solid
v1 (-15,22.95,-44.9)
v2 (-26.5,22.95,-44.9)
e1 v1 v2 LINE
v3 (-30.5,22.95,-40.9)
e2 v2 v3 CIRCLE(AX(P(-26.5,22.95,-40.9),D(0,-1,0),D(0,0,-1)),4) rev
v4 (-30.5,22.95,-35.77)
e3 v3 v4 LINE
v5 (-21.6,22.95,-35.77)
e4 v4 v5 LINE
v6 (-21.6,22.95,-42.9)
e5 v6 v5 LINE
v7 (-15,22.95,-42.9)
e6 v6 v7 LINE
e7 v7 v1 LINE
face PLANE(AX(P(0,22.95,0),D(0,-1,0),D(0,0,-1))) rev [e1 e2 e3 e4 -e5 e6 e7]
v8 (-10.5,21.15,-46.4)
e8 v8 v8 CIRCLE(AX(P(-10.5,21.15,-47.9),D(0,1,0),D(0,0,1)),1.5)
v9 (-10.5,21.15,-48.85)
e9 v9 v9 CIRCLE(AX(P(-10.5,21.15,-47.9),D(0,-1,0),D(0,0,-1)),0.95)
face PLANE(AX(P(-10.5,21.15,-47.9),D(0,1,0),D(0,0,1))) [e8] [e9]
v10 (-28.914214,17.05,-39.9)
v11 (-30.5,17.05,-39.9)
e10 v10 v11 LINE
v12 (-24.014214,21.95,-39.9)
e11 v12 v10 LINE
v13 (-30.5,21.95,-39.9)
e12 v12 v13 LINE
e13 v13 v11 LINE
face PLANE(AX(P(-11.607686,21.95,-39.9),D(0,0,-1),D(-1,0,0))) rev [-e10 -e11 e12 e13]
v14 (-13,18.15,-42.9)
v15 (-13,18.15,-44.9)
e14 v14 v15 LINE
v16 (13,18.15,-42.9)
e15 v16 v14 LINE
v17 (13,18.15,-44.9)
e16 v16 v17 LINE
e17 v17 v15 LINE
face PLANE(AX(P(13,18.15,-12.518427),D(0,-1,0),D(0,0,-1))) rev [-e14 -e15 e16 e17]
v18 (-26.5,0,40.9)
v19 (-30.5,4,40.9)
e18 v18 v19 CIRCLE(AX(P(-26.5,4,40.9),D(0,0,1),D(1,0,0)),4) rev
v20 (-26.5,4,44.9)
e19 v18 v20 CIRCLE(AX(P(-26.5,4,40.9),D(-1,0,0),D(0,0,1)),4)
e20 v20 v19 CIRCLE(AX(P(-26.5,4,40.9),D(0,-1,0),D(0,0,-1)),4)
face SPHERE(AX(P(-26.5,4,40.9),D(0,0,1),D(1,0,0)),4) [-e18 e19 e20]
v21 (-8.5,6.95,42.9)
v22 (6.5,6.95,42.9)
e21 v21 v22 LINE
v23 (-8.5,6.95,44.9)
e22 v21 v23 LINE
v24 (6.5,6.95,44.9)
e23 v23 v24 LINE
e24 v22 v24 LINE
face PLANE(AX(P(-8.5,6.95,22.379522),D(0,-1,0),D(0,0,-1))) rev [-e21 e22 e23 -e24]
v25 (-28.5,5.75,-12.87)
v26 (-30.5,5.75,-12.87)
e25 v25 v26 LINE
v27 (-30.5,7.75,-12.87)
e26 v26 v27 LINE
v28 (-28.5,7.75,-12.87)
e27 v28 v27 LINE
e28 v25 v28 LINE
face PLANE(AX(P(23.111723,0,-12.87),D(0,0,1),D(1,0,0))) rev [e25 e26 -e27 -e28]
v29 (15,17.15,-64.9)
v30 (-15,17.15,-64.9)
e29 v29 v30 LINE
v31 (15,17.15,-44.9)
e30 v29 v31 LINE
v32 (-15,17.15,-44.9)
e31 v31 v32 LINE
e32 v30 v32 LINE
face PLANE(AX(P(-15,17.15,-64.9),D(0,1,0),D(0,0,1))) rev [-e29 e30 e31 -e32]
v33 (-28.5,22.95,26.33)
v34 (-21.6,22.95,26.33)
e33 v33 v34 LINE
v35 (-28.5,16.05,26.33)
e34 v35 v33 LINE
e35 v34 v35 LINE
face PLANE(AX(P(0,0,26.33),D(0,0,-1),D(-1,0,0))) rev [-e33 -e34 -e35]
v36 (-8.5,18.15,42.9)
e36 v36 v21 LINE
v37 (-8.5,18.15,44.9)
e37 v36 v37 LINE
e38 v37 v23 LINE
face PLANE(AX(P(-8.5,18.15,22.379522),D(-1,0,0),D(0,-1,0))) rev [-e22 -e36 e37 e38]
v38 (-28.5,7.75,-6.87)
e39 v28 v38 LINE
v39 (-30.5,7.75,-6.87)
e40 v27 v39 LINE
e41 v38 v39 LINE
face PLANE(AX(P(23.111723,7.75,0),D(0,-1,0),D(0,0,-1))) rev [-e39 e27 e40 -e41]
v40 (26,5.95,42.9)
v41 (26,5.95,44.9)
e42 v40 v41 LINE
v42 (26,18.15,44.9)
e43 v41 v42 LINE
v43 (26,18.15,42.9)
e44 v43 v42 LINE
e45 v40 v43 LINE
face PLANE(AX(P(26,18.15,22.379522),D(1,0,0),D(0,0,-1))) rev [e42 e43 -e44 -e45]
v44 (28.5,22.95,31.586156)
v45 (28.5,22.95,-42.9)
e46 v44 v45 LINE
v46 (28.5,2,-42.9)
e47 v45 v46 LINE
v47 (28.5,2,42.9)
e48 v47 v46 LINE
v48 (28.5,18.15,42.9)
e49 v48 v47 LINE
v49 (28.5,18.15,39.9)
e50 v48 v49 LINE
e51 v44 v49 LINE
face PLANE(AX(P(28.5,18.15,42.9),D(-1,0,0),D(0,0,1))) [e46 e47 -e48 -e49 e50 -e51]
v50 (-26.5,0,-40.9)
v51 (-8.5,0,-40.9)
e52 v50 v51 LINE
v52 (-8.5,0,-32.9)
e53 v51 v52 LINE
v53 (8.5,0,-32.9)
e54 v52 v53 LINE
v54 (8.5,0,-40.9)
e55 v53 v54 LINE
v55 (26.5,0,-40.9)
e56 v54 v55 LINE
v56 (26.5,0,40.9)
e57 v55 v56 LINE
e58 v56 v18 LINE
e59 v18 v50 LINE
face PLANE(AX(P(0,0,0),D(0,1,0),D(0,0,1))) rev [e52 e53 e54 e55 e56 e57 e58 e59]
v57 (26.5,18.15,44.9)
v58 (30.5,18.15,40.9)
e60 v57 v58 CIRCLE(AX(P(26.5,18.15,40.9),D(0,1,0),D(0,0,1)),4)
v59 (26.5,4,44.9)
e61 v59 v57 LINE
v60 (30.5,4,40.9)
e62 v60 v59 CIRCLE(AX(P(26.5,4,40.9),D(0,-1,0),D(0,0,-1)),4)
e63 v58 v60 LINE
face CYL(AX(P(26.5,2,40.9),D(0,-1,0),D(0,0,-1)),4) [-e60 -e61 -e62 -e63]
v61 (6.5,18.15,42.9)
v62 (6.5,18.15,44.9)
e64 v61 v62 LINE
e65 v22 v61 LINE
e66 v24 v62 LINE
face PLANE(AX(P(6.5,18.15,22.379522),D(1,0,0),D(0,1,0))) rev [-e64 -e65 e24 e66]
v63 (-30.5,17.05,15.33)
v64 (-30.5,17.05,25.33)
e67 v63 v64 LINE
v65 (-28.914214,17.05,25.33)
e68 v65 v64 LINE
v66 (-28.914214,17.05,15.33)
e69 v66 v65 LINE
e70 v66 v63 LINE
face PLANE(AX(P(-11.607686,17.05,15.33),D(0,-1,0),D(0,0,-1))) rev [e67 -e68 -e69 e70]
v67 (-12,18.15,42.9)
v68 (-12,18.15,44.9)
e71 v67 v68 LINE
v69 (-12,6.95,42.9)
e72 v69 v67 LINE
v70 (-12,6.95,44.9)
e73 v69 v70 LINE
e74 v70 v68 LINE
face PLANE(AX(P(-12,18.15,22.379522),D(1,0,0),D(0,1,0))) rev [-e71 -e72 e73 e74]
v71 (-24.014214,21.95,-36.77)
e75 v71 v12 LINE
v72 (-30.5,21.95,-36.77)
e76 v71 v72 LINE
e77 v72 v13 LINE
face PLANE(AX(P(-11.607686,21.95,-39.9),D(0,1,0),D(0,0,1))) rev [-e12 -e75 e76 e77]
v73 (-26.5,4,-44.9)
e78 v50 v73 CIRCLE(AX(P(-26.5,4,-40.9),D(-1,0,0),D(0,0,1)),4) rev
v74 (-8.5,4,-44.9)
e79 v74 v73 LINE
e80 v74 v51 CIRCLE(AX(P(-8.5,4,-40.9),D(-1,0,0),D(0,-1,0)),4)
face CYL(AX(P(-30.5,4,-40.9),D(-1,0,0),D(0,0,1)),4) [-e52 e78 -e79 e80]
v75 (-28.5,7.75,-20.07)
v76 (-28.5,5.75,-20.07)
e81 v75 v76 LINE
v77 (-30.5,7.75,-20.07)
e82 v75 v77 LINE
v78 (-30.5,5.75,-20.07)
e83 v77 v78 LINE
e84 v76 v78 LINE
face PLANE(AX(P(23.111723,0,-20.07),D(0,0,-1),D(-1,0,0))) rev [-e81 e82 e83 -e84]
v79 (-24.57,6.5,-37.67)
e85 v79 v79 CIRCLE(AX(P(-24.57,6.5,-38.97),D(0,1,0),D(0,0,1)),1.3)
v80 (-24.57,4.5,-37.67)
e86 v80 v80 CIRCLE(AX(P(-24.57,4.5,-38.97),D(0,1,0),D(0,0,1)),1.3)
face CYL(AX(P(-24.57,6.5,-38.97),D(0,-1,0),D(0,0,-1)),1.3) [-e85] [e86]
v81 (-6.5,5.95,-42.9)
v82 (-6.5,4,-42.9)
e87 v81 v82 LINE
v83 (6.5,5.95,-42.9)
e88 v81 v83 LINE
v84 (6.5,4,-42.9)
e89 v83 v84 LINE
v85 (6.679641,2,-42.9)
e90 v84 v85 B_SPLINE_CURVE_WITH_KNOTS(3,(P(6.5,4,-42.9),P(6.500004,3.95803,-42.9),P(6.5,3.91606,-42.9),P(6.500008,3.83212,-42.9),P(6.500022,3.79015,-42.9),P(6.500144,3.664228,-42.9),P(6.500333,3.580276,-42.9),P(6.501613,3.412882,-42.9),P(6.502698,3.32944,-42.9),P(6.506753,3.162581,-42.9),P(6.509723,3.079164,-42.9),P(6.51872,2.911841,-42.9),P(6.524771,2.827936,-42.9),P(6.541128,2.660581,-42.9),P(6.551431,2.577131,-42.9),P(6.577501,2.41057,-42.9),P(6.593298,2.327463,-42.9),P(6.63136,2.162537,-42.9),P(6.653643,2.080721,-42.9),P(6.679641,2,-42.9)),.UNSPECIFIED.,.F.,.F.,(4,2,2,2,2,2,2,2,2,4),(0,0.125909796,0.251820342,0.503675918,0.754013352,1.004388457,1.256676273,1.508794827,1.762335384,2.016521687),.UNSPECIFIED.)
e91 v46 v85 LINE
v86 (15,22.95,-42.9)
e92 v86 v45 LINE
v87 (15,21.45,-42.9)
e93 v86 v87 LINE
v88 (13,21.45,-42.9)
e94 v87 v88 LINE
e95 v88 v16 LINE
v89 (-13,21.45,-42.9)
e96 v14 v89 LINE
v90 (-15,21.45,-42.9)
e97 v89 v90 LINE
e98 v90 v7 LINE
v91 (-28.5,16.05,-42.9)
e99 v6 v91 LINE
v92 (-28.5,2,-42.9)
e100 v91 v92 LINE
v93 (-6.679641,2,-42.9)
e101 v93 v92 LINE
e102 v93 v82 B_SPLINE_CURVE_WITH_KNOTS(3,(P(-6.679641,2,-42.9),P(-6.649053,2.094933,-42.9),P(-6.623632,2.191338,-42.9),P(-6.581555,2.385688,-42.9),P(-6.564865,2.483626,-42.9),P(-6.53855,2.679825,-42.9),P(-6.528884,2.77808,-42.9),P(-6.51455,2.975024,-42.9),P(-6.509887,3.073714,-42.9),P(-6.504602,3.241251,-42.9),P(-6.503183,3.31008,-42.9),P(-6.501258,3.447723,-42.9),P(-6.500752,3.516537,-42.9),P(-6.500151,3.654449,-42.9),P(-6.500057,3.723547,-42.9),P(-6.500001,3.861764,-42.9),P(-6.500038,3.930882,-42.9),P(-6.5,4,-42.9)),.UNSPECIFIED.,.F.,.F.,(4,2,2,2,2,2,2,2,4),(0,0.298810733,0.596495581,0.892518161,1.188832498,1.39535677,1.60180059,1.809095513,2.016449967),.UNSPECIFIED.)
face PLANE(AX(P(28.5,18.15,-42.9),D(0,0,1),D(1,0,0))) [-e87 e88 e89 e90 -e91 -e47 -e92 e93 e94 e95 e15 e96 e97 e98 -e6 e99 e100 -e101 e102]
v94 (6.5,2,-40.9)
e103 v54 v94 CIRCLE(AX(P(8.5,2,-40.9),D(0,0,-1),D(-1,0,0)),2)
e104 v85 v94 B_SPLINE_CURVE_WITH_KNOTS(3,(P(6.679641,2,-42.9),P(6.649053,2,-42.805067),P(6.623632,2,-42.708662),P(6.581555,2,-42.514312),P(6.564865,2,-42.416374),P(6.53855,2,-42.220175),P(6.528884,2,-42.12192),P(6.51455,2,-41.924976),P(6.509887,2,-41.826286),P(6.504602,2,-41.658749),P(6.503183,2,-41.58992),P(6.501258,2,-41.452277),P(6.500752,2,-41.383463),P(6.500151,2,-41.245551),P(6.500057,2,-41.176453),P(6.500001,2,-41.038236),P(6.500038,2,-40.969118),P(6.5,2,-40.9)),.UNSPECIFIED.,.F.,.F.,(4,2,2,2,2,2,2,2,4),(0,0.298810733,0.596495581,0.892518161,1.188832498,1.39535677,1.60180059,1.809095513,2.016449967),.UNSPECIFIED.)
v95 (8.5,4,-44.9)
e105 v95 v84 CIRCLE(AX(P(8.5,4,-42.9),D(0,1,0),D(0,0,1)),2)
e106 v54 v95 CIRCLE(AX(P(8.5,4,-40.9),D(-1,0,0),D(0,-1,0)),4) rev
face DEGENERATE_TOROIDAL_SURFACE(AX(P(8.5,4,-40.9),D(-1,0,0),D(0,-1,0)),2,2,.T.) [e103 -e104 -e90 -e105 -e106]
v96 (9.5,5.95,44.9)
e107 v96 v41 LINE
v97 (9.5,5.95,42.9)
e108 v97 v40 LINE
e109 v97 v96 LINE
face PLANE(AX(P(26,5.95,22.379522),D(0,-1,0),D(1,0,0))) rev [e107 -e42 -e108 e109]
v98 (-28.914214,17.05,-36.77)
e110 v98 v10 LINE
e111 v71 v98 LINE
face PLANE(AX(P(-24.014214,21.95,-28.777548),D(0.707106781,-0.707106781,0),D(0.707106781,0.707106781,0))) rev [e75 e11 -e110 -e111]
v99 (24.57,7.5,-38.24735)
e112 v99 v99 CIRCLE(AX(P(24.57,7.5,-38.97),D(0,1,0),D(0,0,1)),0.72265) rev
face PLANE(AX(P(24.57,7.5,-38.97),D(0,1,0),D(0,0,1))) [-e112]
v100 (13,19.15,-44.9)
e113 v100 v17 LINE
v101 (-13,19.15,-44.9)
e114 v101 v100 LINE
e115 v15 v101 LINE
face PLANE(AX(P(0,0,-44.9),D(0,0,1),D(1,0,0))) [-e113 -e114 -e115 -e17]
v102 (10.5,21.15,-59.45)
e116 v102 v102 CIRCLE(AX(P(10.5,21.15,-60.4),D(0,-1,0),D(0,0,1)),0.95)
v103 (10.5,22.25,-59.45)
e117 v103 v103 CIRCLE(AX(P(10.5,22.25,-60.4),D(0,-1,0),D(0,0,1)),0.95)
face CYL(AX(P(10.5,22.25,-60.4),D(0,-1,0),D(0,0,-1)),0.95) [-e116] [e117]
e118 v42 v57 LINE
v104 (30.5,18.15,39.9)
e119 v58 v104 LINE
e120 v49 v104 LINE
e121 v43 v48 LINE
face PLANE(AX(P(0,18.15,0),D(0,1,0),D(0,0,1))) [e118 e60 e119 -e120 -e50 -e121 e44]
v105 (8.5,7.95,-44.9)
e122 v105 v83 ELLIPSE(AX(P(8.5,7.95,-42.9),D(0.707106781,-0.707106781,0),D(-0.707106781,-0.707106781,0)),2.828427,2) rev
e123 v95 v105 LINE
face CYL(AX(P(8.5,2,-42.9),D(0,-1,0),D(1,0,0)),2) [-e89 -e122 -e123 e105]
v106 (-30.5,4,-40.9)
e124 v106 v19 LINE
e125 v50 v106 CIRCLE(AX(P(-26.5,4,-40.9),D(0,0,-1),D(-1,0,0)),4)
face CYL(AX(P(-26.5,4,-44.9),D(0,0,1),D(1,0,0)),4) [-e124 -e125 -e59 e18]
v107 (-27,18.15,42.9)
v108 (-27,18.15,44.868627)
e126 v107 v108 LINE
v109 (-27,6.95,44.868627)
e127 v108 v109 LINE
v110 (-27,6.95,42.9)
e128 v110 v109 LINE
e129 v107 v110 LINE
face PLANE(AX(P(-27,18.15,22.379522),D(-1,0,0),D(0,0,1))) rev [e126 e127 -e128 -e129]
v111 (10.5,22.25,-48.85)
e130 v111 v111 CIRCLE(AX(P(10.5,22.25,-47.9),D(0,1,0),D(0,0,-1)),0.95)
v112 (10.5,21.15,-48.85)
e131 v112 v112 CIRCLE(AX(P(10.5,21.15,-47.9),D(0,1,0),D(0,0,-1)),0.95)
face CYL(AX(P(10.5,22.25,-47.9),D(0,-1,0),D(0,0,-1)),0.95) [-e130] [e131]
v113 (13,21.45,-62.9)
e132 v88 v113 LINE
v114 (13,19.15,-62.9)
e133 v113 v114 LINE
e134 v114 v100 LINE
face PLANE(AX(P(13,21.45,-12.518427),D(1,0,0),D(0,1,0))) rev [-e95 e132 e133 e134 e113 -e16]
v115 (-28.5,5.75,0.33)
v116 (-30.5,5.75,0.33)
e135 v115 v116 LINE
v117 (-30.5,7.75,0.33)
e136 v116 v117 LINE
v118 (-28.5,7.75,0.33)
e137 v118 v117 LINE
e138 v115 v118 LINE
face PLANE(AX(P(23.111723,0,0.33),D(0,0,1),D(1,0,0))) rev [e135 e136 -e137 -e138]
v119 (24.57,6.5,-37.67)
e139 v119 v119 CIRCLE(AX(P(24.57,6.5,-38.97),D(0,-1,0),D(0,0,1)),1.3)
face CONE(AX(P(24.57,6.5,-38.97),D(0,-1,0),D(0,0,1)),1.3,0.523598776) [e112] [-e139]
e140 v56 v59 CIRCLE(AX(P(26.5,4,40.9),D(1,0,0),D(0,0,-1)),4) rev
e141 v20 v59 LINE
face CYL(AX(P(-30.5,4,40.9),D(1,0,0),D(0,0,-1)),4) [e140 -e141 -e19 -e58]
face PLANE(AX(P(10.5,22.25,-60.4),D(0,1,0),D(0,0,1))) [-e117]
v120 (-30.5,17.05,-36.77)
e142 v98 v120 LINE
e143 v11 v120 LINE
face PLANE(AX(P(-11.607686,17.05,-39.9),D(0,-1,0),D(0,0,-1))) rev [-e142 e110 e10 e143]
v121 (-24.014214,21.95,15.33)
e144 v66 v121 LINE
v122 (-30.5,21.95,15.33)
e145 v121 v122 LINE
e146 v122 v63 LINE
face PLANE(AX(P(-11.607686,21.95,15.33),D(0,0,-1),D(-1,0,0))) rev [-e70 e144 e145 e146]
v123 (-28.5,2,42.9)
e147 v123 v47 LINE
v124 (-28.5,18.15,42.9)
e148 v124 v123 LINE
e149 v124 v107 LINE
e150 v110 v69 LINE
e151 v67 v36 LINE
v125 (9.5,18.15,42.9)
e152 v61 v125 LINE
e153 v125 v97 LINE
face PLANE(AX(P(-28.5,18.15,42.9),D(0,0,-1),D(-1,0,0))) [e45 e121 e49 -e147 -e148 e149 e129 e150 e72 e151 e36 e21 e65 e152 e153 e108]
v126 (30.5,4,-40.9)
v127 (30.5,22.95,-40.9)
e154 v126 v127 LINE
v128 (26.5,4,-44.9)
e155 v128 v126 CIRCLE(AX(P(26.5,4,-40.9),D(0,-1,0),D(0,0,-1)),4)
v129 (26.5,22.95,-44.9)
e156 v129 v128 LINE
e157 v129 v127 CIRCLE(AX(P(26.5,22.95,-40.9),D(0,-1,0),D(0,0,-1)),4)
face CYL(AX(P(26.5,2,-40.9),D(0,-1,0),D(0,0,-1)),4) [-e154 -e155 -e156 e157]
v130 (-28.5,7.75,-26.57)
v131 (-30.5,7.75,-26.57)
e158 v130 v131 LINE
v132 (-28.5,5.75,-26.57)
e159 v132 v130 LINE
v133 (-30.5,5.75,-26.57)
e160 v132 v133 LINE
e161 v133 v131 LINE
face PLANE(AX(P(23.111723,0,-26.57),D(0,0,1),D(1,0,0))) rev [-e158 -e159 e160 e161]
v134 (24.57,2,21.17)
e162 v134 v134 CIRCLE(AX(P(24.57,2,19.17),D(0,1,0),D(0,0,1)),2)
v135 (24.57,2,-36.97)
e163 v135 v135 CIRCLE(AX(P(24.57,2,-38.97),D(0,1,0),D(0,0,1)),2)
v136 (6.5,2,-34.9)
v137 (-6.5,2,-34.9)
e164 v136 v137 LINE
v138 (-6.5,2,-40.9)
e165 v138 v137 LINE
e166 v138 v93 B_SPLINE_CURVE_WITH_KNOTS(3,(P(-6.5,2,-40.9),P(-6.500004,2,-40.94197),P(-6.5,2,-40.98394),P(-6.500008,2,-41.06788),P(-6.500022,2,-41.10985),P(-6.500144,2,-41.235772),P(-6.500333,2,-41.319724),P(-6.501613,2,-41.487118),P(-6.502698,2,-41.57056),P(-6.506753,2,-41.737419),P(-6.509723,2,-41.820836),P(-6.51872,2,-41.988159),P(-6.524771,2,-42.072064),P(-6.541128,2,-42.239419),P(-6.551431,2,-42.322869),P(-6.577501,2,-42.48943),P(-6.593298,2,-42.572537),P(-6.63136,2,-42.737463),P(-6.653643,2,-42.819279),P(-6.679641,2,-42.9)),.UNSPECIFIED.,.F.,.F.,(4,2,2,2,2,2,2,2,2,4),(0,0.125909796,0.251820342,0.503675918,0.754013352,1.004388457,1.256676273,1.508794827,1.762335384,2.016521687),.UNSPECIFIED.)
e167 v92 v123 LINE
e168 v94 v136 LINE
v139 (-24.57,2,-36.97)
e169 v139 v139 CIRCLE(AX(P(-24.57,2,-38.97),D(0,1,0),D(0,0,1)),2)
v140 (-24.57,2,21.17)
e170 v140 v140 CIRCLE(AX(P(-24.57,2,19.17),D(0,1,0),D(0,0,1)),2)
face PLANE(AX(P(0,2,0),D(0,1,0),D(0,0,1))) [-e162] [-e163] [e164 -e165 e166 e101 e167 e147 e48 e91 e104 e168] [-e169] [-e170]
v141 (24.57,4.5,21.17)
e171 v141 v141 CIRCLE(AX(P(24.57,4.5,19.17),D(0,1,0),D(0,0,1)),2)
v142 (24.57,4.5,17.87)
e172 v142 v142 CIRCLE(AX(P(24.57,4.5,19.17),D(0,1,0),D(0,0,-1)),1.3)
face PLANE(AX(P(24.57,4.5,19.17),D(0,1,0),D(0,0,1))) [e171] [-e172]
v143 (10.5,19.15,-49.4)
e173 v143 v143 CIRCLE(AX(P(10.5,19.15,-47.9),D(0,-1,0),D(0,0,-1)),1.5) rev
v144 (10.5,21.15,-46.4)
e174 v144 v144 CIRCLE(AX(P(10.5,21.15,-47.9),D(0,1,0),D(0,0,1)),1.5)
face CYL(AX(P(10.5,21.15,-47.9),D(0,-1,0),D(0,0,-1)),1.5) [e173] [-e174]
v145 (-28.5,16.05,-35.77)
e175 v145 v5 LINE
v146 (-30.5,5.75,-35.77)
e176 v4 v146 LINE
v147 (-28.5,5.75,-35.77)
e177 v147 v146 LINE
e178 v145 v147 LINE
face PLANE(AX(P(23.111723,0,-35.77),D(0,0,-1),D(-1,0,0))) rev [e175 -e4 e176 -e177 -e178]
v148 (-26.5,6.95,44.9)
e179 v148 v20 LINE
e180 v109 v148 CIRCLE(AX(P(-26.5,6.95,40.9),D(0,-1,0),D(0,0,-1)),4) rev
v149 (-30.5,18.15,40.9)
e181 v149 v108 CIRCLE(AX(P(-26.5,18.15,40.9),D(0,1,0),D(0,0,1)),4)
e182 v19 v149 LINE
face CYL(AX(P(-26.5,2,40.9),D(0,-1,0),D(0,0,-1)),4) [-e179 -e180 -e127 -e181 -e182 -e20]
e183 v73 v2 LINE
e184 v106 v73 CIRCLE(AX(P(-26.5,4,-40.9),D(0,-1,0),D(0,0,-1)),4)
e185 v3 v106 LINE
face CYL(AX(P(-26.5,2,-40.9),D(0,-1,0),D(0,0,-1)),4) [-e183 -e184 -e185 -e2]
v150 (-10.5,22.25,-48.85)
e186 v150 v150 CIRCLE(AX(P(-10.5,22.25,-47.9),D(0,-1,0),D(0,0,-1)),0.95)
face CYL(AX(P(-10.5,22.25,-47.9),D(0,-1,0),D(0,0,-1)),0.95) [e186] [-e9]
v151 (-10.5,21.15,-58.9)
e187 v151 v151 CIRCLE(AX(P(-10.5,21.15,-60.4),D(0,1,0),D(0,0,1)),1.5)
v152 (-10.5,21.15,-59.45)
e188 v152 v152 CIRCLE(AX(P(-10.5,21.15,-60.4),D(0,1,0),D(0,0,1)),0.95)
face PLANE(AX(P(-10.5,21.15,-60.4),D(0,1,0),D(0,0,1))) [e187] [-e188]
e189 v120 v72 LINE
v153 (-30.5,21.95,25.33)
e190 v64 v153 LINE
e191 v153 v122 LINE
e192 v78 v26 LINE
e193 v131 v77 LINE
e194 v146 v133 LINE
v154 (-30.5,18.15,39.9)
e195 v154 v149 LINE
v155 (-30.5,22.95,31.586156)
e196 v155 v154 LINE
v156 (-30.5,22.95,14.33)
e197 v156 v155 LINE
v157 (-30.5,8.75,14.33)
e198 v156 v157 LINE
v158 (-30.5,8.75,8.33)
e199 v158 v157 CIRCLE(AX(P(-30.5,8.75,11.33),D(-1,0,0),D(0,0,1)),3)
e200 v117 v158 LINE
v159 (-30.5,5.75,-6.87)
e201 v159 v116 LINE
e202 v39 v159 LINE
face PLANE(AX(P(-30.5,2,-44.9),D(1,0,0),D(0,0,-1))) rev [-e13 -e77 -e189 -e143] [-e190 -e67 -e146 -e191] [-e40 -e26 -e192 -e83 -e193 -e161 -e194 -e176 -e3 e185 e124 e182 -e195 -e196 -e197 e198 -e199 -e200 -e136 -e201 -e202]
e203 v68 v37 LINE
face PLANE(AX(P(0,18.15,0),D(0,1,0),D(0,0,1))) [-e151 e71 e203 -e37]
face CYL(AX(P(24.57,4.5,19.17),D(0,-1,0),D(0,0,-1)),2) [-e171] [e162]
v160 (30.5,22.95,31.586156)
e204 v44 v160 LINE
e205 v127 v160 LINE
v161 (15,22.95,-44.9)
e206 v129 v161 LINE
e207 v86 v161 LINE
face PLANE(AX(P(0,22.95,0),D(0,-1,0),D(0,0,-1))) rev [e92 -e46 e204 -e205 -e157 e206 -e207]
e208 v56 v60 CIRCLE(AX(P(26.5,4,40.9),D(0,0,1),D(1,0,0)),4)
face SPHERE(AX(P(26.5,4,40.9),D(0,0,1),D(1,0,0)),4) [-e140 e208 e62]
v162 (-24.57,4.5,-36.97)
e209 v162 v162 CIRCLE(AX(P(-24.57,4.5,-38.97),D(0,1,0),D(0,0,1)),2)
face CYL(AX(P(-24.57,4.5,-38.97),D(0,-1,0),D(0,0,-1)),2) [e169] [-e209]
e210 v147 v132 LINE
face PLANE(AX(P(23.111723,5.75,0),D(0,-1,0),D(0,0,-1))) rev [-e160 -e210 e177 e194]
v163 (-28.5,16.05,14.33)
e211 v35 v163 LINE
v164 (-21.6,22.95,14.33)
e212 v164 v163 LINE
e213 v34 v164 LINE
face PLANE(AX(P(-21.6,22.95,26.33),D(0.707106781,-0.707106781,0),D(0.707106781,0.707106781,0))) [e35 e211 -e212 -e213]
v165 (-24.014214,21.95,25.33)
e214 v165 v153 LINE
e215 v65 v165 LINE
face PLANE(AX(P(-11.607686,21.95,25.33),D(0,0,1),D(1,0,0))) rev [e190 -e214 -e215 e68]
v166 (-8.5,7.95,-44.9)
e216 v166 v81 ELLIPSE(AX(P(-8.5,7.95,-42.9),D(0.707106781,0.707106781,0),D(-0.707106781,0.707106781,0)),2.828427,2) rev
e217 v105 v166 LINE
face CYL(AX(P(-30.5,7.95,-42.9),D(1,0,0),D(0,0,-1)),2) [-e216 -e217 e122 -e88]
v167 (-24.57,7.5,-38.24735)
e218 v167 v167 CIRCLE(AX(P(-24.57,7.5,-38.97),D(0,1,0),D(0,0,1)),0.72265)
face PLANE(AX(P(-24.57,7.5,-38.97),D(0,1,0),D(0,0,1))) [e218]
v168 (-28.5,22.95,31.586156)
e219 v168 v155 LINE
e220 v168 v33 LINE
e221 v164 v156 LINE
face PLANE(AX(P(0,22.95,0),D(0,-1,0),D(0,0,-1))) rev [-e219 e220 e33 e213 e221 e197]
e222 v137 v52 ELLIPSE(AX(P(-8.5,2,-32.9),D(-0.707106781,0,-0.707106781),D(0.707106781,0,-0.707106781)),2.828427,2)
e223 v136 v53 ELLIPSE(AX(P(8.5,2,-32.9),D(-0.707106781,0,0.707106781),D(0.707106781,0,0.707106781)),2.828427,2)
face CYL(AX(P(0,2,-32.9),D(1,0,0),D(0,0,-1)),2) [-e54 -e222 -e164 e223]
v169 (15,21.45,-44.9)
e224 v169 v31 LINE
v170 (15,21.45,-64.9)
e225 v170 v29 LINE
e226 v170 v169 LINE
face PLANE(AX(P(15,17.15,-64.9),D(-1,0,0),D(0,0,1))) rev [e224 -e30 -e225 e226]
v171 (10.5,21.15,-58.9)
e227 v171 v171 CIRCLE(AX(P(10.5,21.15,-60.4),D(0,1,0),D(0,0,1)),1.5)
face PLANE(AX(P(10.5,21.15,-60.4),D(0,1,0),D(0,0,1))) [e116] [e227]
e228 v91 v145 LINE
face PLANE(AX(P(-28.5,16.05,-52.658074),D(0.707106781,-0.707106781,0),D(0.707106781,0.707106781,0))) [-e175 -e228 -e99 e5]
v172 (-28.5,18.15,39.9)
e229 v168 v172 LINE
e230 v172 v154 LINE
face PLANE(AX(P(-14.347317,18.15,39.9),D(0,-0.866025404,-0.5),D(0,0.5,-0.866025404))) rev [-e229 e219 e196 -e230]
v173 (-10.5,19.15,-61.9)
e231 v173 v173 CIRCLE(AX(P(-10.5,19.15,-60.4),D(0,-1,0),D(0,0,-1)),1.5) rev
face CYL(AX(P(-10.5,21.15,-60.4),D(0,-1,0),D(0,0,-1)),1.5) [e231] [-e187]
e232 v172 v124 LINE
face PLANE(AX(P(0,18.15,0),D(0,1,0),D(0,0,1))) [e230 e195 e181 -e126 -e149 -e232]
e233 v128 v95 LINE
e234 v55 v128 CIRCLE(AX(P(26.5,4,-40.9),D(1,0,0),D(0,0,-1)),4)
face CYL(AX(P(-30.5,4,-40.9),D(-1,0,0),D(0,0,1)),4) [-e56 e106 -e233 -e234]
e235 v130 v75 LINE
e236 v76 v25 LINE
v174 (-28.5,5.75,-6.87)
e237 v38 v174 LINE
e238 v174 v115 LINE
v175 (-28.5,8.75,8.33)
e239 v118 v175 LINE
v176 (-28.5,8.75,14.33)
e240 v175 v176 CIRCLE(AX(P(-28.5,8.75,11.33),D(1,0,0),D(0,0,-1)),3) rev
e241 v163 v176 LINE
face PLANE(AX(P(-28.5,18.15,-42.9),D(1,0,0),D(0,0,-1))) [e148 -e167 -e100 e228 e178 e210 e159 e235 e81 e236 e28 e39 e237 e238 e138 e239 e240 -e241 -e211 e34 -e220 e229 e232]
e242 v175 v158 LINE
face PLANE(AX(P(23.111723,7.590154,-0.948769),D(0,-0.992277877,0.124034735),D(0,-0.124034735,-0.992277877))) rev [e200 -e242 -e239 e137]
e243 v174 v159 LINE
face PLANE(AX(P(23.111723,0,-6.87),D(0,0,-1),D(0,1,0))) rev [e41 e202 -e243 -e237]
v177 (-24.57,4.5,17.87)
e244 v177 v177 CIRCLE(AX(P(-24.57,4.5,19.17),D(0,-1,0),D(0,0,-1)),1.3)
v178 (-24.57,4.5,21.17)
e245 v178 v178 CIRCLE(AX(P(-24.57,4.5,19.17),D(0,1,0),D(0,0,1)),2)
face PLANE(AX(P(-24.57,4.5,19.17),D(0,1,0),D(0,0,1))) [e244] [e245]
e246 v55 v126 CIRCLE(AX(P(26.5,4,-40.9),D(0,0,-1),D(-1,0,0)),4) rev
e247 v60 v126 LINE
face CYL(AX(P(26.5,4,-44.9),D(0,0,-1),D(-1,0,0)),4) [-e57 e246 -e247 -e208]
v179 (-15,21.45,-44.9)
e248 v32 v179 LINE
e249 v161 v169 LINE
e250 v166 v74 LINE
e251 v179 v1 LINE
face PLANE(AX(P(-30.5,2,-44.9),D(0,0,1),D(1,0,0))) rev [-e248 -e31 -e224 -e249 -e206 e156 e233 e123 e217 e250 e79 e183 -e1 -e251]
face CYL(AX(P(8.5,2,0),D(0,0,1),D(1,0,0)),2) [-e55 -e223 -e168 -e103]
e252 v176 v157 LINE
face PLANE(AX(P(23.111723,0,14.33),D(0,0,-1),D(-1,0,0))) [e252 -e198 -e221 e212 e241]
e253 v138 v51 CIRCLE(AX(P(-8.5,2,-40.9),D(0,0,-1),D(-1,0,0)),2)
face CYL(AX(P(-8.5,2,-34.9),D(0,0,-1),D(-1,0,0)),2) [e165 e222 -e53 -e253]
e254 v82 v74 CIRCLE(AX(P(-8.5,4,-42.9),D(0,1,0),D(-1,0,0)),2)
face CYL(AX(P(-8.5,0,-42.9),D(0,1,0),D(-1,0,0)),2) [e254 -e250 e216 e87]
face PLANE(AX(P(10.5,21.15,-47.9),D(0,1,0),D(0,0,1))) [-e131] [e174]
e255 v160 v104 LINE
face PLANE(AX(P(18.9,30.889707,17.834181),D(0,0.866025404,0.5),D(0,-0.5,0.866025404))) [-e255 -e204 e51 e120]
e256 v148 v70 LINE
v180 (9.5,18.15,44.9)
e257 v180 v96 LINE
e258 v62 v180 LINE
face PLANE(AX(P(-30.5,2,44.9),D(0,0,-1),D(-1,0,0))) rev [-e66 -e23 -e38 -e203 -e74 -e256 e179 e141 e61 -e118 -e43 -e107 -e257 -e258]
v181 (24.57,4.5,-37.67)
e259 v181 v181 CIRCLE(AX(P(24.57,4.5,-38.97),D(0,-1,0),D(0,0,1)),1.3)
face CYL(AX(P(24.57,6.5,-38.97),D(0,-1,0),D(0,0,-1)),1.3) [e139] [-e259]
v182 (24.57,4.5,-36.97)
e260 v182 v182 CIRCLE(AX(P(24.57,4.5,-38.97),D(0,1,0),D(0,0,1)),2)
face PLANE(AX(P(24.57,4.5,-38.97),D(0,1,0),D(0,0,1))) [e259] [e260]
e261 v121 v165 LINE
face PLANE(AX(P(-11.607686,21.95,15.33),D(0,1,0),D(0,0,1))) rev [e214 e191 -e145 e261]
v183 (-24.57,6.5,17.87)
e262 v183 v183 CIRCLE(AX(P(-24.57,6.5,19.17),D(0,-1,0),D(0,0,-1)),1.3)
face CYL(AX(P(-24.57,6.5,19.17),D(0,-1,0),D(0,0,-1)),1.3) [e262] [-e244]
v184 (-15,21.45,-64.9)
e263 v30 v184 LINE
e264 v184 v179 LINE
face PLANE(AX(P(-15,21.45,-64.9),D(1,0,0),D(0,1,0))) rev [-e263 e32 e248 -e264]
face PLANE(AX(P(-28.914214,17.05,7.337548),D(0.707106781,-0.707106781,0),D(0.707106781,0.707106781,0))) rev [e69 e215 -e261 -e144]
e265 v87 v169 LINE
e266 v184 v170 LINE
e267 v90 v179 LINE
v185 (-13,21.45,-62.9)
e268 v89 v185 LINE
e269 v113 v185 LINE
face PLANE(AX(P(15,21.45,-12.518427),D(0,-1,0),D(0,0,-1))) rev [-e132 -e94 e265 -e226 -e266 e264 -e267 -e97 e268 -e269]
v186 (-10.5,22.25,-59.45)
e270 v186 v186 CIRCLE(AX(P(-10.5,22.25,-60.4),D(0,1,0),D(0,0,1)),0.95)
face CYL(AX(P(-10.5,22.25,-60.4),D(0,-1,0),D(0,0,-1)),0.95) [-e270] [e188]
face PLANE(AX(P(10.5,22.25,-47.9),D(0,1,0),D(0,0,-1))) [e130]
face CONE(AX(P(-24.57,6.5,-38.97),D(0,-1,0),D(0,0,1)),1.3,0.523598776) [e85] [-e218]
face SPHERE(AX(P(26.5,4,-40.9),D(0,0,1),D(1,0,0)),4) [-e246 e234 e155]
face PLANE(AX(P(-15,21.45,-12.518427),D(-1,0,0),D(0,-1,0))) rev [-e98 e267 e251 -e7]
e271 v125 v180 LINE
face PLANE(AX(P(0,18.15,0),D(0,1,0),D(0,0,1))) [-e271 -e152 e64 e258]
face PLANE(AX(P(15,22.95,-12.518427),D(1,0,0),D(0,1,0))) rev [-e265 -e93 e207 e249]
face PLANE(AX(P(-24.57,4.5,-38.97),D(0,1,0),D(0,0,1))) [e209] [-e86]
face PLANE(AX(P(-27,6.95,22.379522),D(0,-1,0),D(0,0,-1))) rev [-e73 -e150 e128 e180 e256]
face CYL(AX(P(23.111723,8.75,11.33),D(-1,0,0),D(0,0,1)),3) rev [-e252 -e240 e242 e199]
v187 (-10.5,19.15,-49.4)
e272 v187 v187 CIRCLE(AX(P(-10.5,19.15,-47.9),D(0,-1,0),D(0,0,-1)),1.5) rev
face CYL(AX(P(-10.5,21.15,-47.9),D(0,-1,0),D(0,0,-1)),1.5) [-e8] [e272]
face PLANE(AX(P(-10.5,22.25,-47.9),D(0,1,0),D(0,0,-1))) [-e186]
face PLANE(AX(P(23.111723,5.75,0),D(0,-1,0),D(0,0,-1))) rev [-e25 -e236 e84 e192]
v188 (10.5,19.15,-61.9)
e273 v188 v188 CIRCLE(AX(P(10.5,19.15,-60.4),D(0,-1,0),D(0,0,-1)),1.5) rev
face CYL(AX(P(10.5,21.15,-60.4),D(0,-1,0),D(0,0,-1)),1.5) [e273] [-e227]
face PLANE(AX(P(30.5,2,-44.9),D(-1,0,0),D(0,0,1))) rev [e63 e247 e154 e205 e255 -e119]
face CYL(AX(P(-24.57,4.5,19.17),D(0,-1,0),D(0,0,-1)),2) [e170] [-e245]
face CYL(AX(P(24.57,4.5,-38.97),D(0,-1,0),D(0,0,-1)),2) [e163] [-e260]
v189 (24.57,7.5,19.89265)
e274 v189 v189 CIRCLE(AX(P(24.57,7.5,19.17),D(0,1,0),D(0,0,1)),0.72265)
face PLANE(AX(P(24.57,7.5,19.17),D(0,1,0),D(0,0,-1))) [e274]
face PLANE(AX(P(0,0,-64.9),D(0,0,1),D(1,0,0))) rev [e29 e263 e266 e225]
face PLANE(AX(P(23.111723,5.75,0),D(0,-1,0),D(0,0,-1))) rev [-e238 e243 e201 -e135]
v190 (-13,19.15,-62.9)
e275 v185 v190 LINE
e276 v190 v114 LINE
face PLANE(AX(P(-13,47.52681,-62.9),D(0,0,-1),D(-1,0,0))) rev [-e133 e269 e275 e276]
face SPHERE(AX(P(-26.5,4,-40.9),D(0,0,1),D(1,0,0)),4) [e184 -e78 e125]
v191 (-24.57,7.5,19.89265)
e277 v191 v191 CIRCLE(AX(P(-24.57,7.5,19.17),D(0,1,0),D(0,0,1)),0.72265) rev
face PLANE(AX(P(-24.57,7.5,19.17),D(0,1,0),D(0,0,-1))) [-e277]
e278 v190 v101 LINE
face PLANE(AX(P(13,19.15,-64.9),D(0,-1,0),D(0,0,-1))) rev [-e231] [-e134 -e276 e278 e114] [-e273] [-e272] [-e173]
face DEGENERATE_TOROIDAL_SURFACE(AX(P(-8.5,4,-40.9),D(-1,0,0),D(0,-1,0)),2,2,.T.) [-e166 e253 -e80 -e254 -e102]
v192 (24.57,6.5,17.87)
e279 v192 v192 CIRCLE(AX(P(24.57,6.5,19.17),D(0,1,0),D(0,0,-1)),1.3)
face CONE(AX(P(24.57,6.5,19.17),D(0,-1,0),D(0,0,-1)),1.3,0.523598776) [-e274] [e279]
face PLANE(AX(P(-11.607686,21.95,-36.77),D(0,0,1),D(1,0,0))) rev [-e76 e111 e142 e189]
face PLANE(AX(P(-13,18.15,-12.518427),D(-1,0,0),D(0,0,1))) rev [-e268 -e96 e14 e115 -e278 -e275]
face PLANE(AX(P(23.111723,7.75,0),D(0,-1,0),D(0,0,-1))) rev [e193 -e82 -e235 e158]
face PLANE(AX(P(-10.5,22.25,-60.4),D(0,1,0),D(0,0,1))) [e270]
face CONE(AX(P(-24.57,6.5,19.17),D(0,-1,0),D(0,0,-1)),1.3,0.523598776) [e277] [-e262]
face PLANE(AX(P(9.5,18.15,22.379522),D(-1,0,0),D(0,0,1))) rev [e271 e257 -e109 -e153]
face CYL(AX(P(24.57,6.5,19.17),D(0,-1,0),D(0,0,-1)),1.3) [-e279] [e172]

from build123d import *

# Parameters (mm, degrees)
SZKIC1_W                     = 61
SZKIC1_H                     = 89.8
DODANIE_WYCI_GNI_CIE1_DEPTH  = 2
SZKIC2_W                     = 61
SZKIC2_H                     = 89.8
SZKIC2_W_2                   = 57
SZKIC2_H_2                   = 85.8
DODANIE_WYCI_GNI_CIE2_DEPTH  = 16.15
SZKIC3_W                     = 15
SZKIC3_H                     = 11.2
SZKIC3_W_2                   = 16.5
SZKIC3_H_2                   = 12.2
WYTNIJ_WYCI_GNI_CIE1_DEPTH   = 2
SZKIC4_W                     = 13
SZKIC4_H                     = 5.95
WYTNIJ_WYCI_GNI_CIE2_DEPTH   = 10
SZKIC6_R                     = 3
WYTNIJ_WYCI_GNI_CIE4_DEPTH   = 2
SZKIC7_R                     = 2
DODANIE_WYCI_GNI_CIE3_DEPTH  = 2.5
SZKIC8_R                     = 1.3
DODANIE_WYCI_GNI_CIE4_DEPTH  = 2
SZKIC9_R                     = 1.3
DODANIE_WYCI_GNI_CIE5_DEPTH  = 1
DODANIE_WYCI_GNI_CIE5_TAPER  = 30
LUSTRO2_COPY_1_SKETCH_R      = 1.3
LUSTRO2_COPY_1_DEPTH         = 2
LUSTRO2_COPY_2_SKETCH_R      = 1.3
LUSTRO2_COPY_2_DEPTH         = 1
LUSTRO2_COPY_2_TAPER         = 30
SZKIC11_W                    = 2
SZKIC11_H                    = 30.57
DODANIE_WYCI_GNI_CIE6_DEPTH  = 4.8
WYTNIJ_WYCI_GNI_CIE5_DEPTH   = 2
DODANIE_WYCI_GNI_CIE7_DEPTH  = 12
DODANIE_WYCI_GNI_CIE8_DEPTH  = 7.13
WYTNIJ_WYCI_GNI_CIE6_REACH   = 81.144
SZKIC15_W                    = 3.13
SZKIC15_H                    = 4.9
SZKIC15_W_2                  = 10
DODANIE_WYCI_GNI_CIE9_DEPTH  = 3.13
DODANIE_WYCI_GNI_CIE10_DEPTH = 10
ZAOKR_GLENIE1_R              = 4
ZAOKR_GLENIE2_R              = 2
DODANIE_WYCI_GNI_CIE11_DEPTH = 4.8
DODANIE_WYCI_GNI_CIE12_DEPTH = 2
WYTNIJ_WYCI_GNI_CIE7_DEPTH   = 2
DODANIE_WYCI_GNI_CIE13_DEPTH = 20
SZKIC22_W                    = 26
SZKIC22_H                    = 2
DODANIE_WYCI_GNI_CIE14_DEPTH = 2.3
SZKIC23_R                    = 1.5
DODANIE_WYCI_GNI_CIE15_DEPTH = 2
SZKIC24_R                    = 0.95
DODANIE_WYCI_GNI_CIE16_DEPTH = 1.1
LUSTRO4_COPY_1_SKETCH_R      = 0.95
LUSTRO4_COPY_1_DEPTH         = 1.1


with BuildPart() as part:
    # Szkic1 → Dodanie-wyciągnięcie1 (new body)
    with BuildSketch(Plane(origin=(0, 0, 0), x_dir=(1, 0, 0), z_dir=(0, 1, 0))):
        Rectangle(SZKIC1_W, SZKIC1_H)
    extrude(amount=DODANIE_WYCI_GNI_CIE1_DEPTH)

    # Szkic2 → Dodanie-wyciągnięcie2 (add)
    with BuildSketch(Plane(origin=(0, 2, 0), x_dir=(1, 0, 0), z_dir=(0, 1, 0))):
        Rectangle(SZKIC2_W, SZKIC2_H)
        Rectangle(SZKIC2_W_2, SZKIC2_H_2, mode=Mode.SUBTRACT)
    extrude(amount=DODANIE_WYCI_GNI_CIE2_DEPTH)

    # Szkic3 → Wytnij-wyciągnięcie1 (cut)
    with BuildSketch(Plane.XY.offset(44.9)):
        with Locations((-19.5, 12.55)):
            Rectangle(SZKIC3_W, SZKIC3_H)
        with Locations((-1, 12.55)):
            Rectangle(SZKIC3_W, SZKIC3_H)
        with Locations((17.75, 12.05)):
            Rectangle(SZKIC3_W_2, SZKIC3_H_2)
    extrude(amount=-WYTNIJ_WYCI_GNI_CIE1_DEPTH, mode=Mode.SUBTRACT)

    # Szkic4 → Wytnij-wyciągnięcie2 (cut)
    with BuildSketch(Plane(origin=(0, 0, -44.9), x_dir=(-1, 0, 0), z_dir=(0, 0, -1))):
        with Locations((0, 2.975)):
            Rectangle(SZKIC4_W, SZKIC4_H)
    extrude(amount=-WYTNIJ_WYCI_GNI_CIE2_DEPTH, mode=Mode.SUBTRACT)

    # Szkic6 → Wytnij-wyciągnięcie4 (cut)
    with BuildSketch(Plane.ZY.offset(30.5)):
        with BuildLine():
            Line((14.33, 18.15), (-35.77, 18.15))
            Line((-35.77, 18.15), (-35.77, 5.75))
            Line((-35.77, 5.75), (-26.57, 5.75))
            Line((-26.57, 5.75), (-26.57, 7.75))
            Line((-26.57, 7.75), (-20.07, 7.75))
            Line((-20.07, 7.75), (-20.07, 5.75))
            Line((-20.07, 5.75), (-12.87, 5.75))
            Line((-12.87, 5.75), (-12.87, 7.75))
            Line((-12.87, 7.75), (-6.87, 7.75))
            Line((-6.87, 7.75), (-6.87, 5.75))
            Line((-6.87, 5.75), (0.33, 5.75))
            Line((0.33, 5.75), (0.33, 7.75))
            Line((0.33, 7.75), (8.33, 8.75))
            ThreePointArc((8.33, 8.75), (11.33, 11.75), (14.33, 8.75))
            Line((14.33, 8.75), (14.33, 18.15))
        make_face()
        with Locations((11.33, 8.75)):
            Circle(SZKIC6_R)
    extrude(amount=-WYTNIJ_WYCI_GNI_CIE4_DEPTH, mode=Mode.SUBTRACT)

    # Szkic7 → Dodanie-wyciągnięcie3 (add)
    with BuildSketch(Plane(origin=(0, 2, 0), x_dir=(1, 0, 0), z_dir=(0, 1, 0))):
        with Locations(Location((24.57, -19.17, 0), (0, 0, 270))):
            Circle(SZKIC7_R)
        with Locations(Location((-24.57, -19.17, 0), (0, 0, 270))):
            Circle(SZKIC7_R)
        with Locations(Location((24.57, 38.97, 0), (0, 0, 270))):
            Circle(SZKIC7_R)
        with Locations(Location((-24.57, 38.97, 0), (0, 0, 270))):
            Circle(SZKIC7_R)
    extrude(amount=DODANIE_WYCI_GNI_CIE3_DEPTH)

    # Szkic8 → Dodanie-wyciągnięcie4 (add)
    with BuildSketch(Plane(origin=(0, 4.5, 0), x_dir=(1, 0, 0), z_dir=(0, 1, 0))):
        with Locations(Location((-24.57, 38.97, 0), (0, 0, 270))):
            Circle(SZKIC8_R)
    dodanie_wyci_gni_cie4 = extrude(amount=DODANIE_WYCI_GNI_CIE4_DEPTH)

    # Szkic9 → Dodanie-wyciągnięcie5 (add)
    with BuildSketch(Plane(origin=(0, 6.5, 0), x_dir=(1, 0, 0), z_dir=(0, 1, 0))):
        with Locations(Location((-24.57, 38.97, 0), (0, 0, 270))):
            Circle(SZKIC9_R)
    dodanie_wyci_gni_cie5 = extrude(amount=DODANIE_WYCI_GNI_CIE5_DEPTH, taper=DODANIE_WYCI_GNI_CIE5_TAPER)

    # Lustro1: Dodanie-wyciągnięcie4, Dodanie-wyciągnięcie5 across plane
    add(dodanie_wyci_gni_cie4.mirror(Plane.ZY))
    add(dodanie_wyci_gni_cie5.mirror(Plane.ZY))

    # Lustro2: Dodanie-wyciągnięcie4, Dodanie-wyciągnięcie5 across plane
    add(dodanie_wyci_gni_cie4.mirror(Plane.XY.offset(-9.9)))
    add(dodanie_wyci_gni_cie5.mirror(Plane.XY.offset(-9.9)))

    # Lustro2 copy 1 sketch → Lustro2 copy 1 (add)
    with BuildSketch(Plane(origin=(0, 4.5, -19.8), x_dir=(-1, 0, 0), z_dir=(0, 1, 0))):
        with Locations(Location((-24.57, 38.97, 0), (0, 0, 270))):
            Circle(LUSTRO2_COPY_1_SKETCH_R)
    extrude(amount=LUSTRO2_COPY_1_DEPTH)

    # Lustro2 copy 2 sketch → Lustro2 copy 2 (add)
    with BuildSketch(Plane(origin=(0, 6.5, -19.8), x_dir=(-1, 0, 0), z_dir=(0, 1, 0))):
        with Locations(Location((-24.57, 38.97, 0), (0, 0, 270))):
            Circle(LUSTRO2_COPY_2_SKETCH_R)
    extrude(amount=LUSTRO2_COPY_2_DEPTH, taper=LUSTRO2_COPY_2_TAPER)

    # Szkic11 → Dodanie-wyciągnięcie6 (add)
    with BuildSketch(Plane(origin=(0, 18.15, 0), x_dir=(1, 0, 0), z_dir=(0, 1, 0))):
        Polygon((-28.5, 35.77), (-30.5, 35.77), (-30.5, 44.9), (-20.5, 44.9), (-20.5, 42.9), (-28.5, 42.9), align=None)
        with Locations((-29.5, -29.615)):
            Rectangle(SZKIC11_W, SZKIC11_H)
    extrude(amount=DODANIE_WYCI_GNI_CIE6_DEPTH)

    # Szkic12 → Wytnij-wyciągnięcie5 (cut)
    with BuildSketch(Plane.ZY.offset(30.5)):
        Polygon((44.9, 18.15), (39.9, 18.15), (31.586156124, 22.95), (44.9, 22.95), align=None)
    extrude(amount=-WYTNIJ_WYCI_GNI_CIE5_DEPTH, mode=Mode.SUBTRACT)

    # Szkic13 → Dodanie-wyciągnięcie7 (add)
    with BuildSketch(Plane(origin=(0, 0, 14.33), x_dir=(-1, 0, 0), z_dir=(0, 0, -1))):
        Polygon((28.5, 22.95), (21.6, 22.95), (28.5, 16.05), align=None)
    extrude(amount=-DODANIE_WYCI_GNI_CIE7_DEPTH)

    # Szkic14 → Dodanie-wyciągnięcie8 (add)
    with BuildSketch(Plane.XY.offset(-35.77)):
        Polygon((-21.6, 22.95), (-28.5, 22.95), (-28.5, 16.05), align=None)
    extrude(amount=-DODANIE_WYCI_GNI_CIE8_DEPTH)

    # Wytnij-wyciągnięcie6: up to this plane
    wytnij_wyci_gni_cie6_end = Plane(origin=(-21.6, 22.95, 26.33), z_dir=(0.7071067811865437, -0.7071067811865515, 0))
    # Szkic15 → Wytnij-wyciągnięcie6 (cut, up to the surface)
    with BuildSketch(Plane.ZY.offset(30.5), mode=Mode.PRIVATE) as wytnij_wyci_gni_cie6_sk1:
        with Locations((-38.335, 19.5)):
            Rectangle(SZKIC15_W, SZKIC15_H)
    wytnij_wyci_gni_cie6_tool1 = split(extrude(wytnij_wyci_gni_cie6_sk1.sketch, amount=-WYTNIJ_WYCI_GNI_CIE6_REACH, mode=Mode.PRIVATE), bisect_by=wytnij_wyci_gni_cie6_end, keep=Keep.BOTH, mode=Mode.PRIVATE)
    add(wytnij_wyci_gni_cie6_tool1.solids().sort_by_distance((-30.5, 19.5, -38.335))[0], mode=Mode.SUBTRACT)
    # Szkic15 → Wytnij-wyciągnięcie6 (cut, up to the surface)
    with BuildSketch(Plane.ZY.offset(30.5), mode=Mode.PRIVATE) as wytnij_wyci_gni_cie6_sk2:
        with Locations((20.33, 19.5)):
            Rectangle(SZKIC15_W_2, SZKIC15_H)
    wytnij_wyci_gni_cie6_tool2 = split(extrude(wytnij_wyci_gni_cie6_sk2.sketch, amount=-WYTNIJ_WYCI_GNI_CIE6_REACH, mode=Mode.PRIVATE), bisect_by=wytnij_wyci_gni_cie6_end, keep=Keep.BOTH, mode=Mode.PRIVATE)
    add(wytnij_wyci_gni_cie6_tool2.solids().sort_by_distance((-30.5, 19.5, 20.33))[0], mode=Mode.SUBTRACT)

    # Szkic16 → Dodanie-wyciągnięcie9 (add)
    with BuildSketch(Plane.XY.offset(-39.9)):
        Polygon((-27.5, 17.05), (-22.6, 21.95), (-24.014213562, 21.95), (-28.914213562, 17.05), align=None)
    extrude(amount=DODANIE_WYCI_GNI_CIE9_DEPTH)

    # Szkic17 → Dodanie-wyciągnięcie10 (add)
    with BuildSketch(Plane(origin=(0, 0, 25.33), x_dir=(-1, 0, 0), z_dir=(0, 0, -1))):
        Polygon((27.5, 17.05), (28.914213562, 17.05), (24.014213562, 21.95), (22.6, 21.95), align=None)
    extrude(amount=DODANIE_WYCI_GNI_CIE10_DEPTH)

    # Zaokrąglenie1
    zaokr_glenie1_edges = [part.edges().sort_by_distance(p)[0] for p in [
        (-18.5, 0, -44.9),
        (18.5, 0, -44.9),
        (30.5, 0, 0),
        (0, 0, 44.9),
        (-30.5, 0, 0),
        (-30.5, 9.075, 44.9),
        (30.5, 9.075, 44.9),
        (30.5, 9.075, -44.9),
        (-30.5, 11.475, -44.9),
    ]]
    fillet(zaokr_glenie1_edges, radius=ZAOKR_GLENIE1_R)

    # Zaokrąglenie2
    # the kernel refuses this fillet: 2 mm, written as the material it takes off along each edge
    with BuildSketch(Plane(origin=(-6.5, 4, -44.9), x_dir=(-1, 0, 0), z_dir=(0, 1, 0)), Plane(origin=(6.5, 5.95, -44.9), x_dir=(1, 0, 0), z_dir=(0, -1, 0))) as zaokr_glenie2_piece_1:
        with BuildLine():
            CenterArc((ZAOKR_GLENIE2_R, ZAOKR_GLENIE2_R), ZAOKR_GLENIE2_R, 180, 90)
            Line((0, ZAOKR_GLENIE2_R), (0, 0))
            Line((0, 0), (ZAOKR_GLENIE2_R, 0))
        make_face()
    extrude(amount=1.95, mode=Mode.SUBTRACT)
    with BuildSketch(Plane(origin=(-6.5, 4, -40.9), x_dir=(0, 0, -1), z_dir=(0, 1, 0))) as zaokr_glenie2_piece_2:
        with BuildLine():
            CenterArc((4 - ZAOKR_GLENIE2_R, ZAOKR_GLENIE2_R), ZAOKR_GLENIE2_R, 270, 90)
            Line((4 - ZAOKR_GLENIE2_R, 0), (4, 0))
            Line((4, 0), (4, ZAOKR_GLENIE2_R))
        make_face()
    revolve(axis=Axis((-6.5, 4, -40.9), (-1, 0, 0)), revolution_arc=90, mode=Mode.SUBTRACT)
    with BuildSketch(Plane(origin=(6.5, 4, -40.9), x_dir=(0, 0, -1), z_dir=(0, 1, 0))) as zaokr_glenie2_piece_3:
        with BuildLine():
            CenterArc((4 - ZAOKR_GLENIE2_R, -ZAOKR_GLENIE2_R), ZAOKR_GLENIE2_R, 0, 90)
            Line((4 - ZAOKR_GLENIE2_R, 0), (4, 0))
            Line((4, 0), (4, -ZAOKR_GLENIE2_R))
        make_face()
    revolve(axis=Axis((6.5, 4, -40.9), (-1, 0, 0)), revolution_arc=90, mode=Mode.SUBTRACT)
    with BuildSketch(Plane(origin=(-6.5, 5.95, -44.9), x_dir=(0, 1, 0), z_dir=(1, 0, 0)), Plane(origin=(6.5, 0, -34.9), x_dir=(0, 0, 1), z_dir=(-1, 0, 0))) as zaokr_glenie2_piece_4:
        with BuildLine():
            CenterArc((ZAOKR_GLENIE2_R, ZAOKR_GLENIE2_R), ZAOKR_GLENIE2_R, 180, 90)
            Line((0, ZAOKR_GLENIE2_R), (0, 0))
            Line((0, 0), (ZAOKR_GLENIE2_R, 0))
        make_face()
    extrude(amount=13, mode=Mode.SUBTRACT)
    with BuildSketch(Plane(origin=(-6.5, 0, -40.9), x_dir=(0, 1, 0), z_dir=(0, 0, 1))) as zaokr_glenie2_piece_5:
        with BuildLine():
            CenterArc((ZAOKR_GLENIE2_R, ZAOKR_GLENIE2_R), ZAOKR_GLENIE2_R, 180, 90)
            Line((0, ZAOKR_GLENIE2_R), (0, 0))
            Line((0, 0), (ZAOKR_GLENIE2_R, 0))
        make_face()
    extrude(amount=6, mode=Mode.SUBTRACT)
    with BuildSketch(Plane(origin=(6.5, 0, -40.9), x_dir=(0, 1, 0), z_dir=(0, 0, 1))) as zaokr_glenie2_piece_6:
        with BuildLine():
            CenterArc((ZAOKR_GLENIE2_R, -ZAOKR_GLENIE2_R), ZAOKR_GLENIE2_R, 90, 90)
            Line((0, -ZAOKR_GLENIE2_R), (0, 0))
            Line((0, 0), (ZAOKR_GLENIE2_R, 0))
        make_face()
    extrude(amount=6, mode=Mode.SUBTRACT)
    with BuildSketch(Plane(origin=(-6.5, 4, -44.9), x_dir=(-1, 0, 0), z_dir=(0, 1, 0))) as zaokr_glenie2_piece_7a_section:
        with BuildLine():
            CenterArc((ZAOKR_GLENIE2_R, ZAOKR_GLENIE2_R), ZAOKR_GLENIE2_R, 180, 90)
            Line((0, ZAOKR_GLENIE2_R), (0, 0))
            Line((0, 0), (ZAOKR_GLENIE2_R, 0))
        make_face()
    zaokr_glenie2_piece_7a = extrude(amount=6.95, mode=Mode.PRIVATE)
    zaokr_glenie2_piece_7a = split(zaokr_glenie2_piece_7a, bisect_by=Plane(origin=(-6.952790229, 5.95, -44.447209771), z_dir=(0, 1, 0)), keep=Keep.TOP, mode=Mode.PRIVATE)
    with BuildSketch(Plane(origin=(-11.5, 5.95, -44.9), x_dir=(0, 1, 0), z_dir=(1, 0, 0))) as zaokr_glenie2_piece_7b_section:
        with BuildLine():
            CenterArc((ZAOKR_GLENIE2_R, ZAOKR_GLENIE2_R), ZAOKR_GLENIE2_R, 180, 90)
            Line((0, ZAOKR_GLENIE2_R), (0, 0))
            Line((0, 0), (ZAOKR_GLENIE2_R, 0))
        make_face()
    zaokr_glenie2_piece_7b = extrude(amount=18, mode=Mode.PRIVATE)
    zaokr_glenie2_piece_7b = split(zaokr_glenie2_piece_7b, bisect_by=Plane(origin=(-6.5, 6.402790229, -44.447209771), z_dir=(-1, 0, 0)), keep=Keep.TOP, mode=Mode.PRIVATE)
    zaokr_glenie2_piece_7 = zaokr_glenie2_piece_7a & zaokr_glenie2_piece_7b
    add(zaokr_glenie2_piece_7, mode=Mode.SUBTRACT)
    with BuildSketch(Plane(origin=(-6.5, 5.95, -44.9), x_dir=(0, 1, 0), z_dir=(1, 0, 0))) as zaokr_glenie2_piece_8a_section:
        with BuildLine():
            CenterArc((ZAOKR_GLENIE2_R, ZAOKR_GLENIE2_R), ZAOKR_GLENIE2_R, 180, 90)
            Line((0, ZAOKR_GLENIE2_R), (0, 0))
            Line((0, 0), (ZAOKR_GLENIE2_R, 0))
        make_face()
    zaokr_glenie2_piece_8a = extrude(amount=18, mode=Mode.PRIVATE)
    zaokr_glenie2_piece_8a = split(zaokr_glenie2_piece_8a, bisect_by=Plane(origin=(6.5, 6.402790229, -44.447209771), z_dir=(1, 0, 0)), keep=Keep.TOP, mode=Mode.PRIVATE)
    with BuildSketch(Plane(origin=(6.5, 10.95, -44.9), x_dir=(1, 0, 0), z_dir=(0, -1, 0))) as zaokr_glenie2_piece_8b_section:
        with BuildLine():
            CenterArc((ZAOKR_GLENIE2_R, ZAOKR_GLENIE2_R), ZAOKR_GLENIE2_R, 180, 90)
            Line((0, ZAOKR_GLENIE2_R), (0, 0))
            Line((0, 0), (ZAOKR_GLENIE2_R, 0))
        make_face()
    zaokr_glenie2_piece_8b = extrude(amount=6.95, mode=Mode.PRIVATE)
    zaokr_glenie2_piece_8b = split(zaokr_glenie2_piece_8b, bisect_by=Plane(origin=(6.952790229, 5.95, -44.447209771), z_dir=(0, 1, 0)), keep=Keep.TOP, mode=Mode.PRIVATE)
    zaokr_glenie2_piece_8 = zaokr_glenie2_piece_8a & zaokr_glenie2_piece_8b
    add(zaokr_glenie2_piece_8, mode=Mode.SUBTRACT)
    with BuildSketch(Plane(origin=(-6.5, 0, -40.9), x_dir=(0, 1, 0), z_dir=(0, 0, 1))) as zaokr_glenie2_piece_9a_section:
        with BuildLine():
            CenterArc((ZAOKR_GLENIE2_R, ZAOKR_GLENIE2_R), ZAOKR_GLENIE2_R, 180, 90)
            Line((0, ZAOKR_GLENIE2_R), (0, 0))
            Line((0, 0), (ZAOKR_GLENIE2_R, 0))
        make_face()
    zaokr_glenie2_piece_9a = extrude(amount=11, mode=Mode.PRIVATE)
    zaokr_glenie2_piece_9a = split(zaokr_glenie2_piece_9a, bisect_by=Plane(origin=(-6.952790229, 0.452790229, -34.9), z_dir=(0, 0, 1)), keep=Keep.TOP, mode=Mode.PRIVATE)
    with BuildSketch(Plane(origin=(6.5, 0, -34.9), x_dir=(0, 0, 1), z_dir=(-1, 0, 0))) as zaokr_glenie2_piece_9b_section:
        with BuildLine():
            CenterArc((ZAOKR_GLENIE2_R, ZAOKR_GLENIE2_R), ZAOKR_GLENIE2_R, 180, 90)
            Line((0, ZAOKR_GLENIE2_R), (0, 0))
            Line((0, 0), (ZAOKR_GLENIE2_R, 0))
        make_face()
    zaokr_glenie2_piece_9b = extrude(amount=18, mode=Mode.PRIVATE)
    zaokr_glenie2_piece_9b = split(zaokr_glenie2_piece_9b, bisect_by=Plane(origin=(-6.5, 0.452790229, -34.447209771), z_dir=(-1, 0, 0)), keep=Keep.TOP, mode=Mode.PRIVATE)
    zaokr_glenie2_piece_9 = zaokr_glenie2_piece_9a & zaokr_glenie2_piece_9b
    add(zaokr_glenie2_piece_9, mode=Mode.SUBTRACT)
    with BuildSketch(Plane(origin=(6.5, 0, -40.9), x_dir=(0, 1, 0), z_dir=(0, 0, 1))) as zaokr_glenie2_piece_10a_section:
        with BuildLine():
            CenterArc((ZAOKR_GLENIE2_R, -ZAOKR_GLENIE2_R), ZAOKR_GLENIE2_R, 90, 90)
            Line((0, -ZAOKR_GLENIE2_R), (0, 0))
            Line((0, 0), (ZAOKR_GLENIE2_R, 0))
        make_face()
    zaokr_glenie2_piece_10a = extrude(amount=11, mode=Mode.PRIVATE)
    zaokr_glenie2_piece_10a = split(zaokr_glenie2_piece_10a, bisect_by=Plane(origin=(6.952790229, 0.452790229, -34.9), z_dir=(0, 0, 1)), keep=Keep.TOP, mode=Mode.PRIVATE)
    with BuildSketch(Plane(origin=(11.5, 0, -34.9), x_dir=(0, 0, 1), z_dir=(-1, 0, 0))) as zaokr_glenie2_piece_10b_section:
        with BuildLine():
            CenterArc((ZAOKR_GLENIE2_R, ZAOKR_GLENIE2_R), ZAOKR_GLENIE2_R, 180, 90)
            Line((0, ZAOKR_GLENIE2_R), (0, 0))
            Line((0, 0), (ZAOKR_GLENIE2_R, 0))
        make_face()
    zaokr_glenie2_piece_10b = extrude(amount=18, mode=Mode.PRIVATE)
    zaokr_glenie2_piece_10b = split(zaokr_glenie2_piece_10b, bisect_by=Plane(origin=(6.5, 0.452790229, -34.447209771), z_dir=(1, 0, 0)), keep=Keep.TOP, mode=Mode.PRIVATE)
    zaokr_glenie2_piece_10 = zaokr_glenie2_piece_10a & zaokr_glenie2_piece_10b
    add(zaokr_glenie2_piece_10, mode=Mode.SUBTRACT)

    # Szkic19 → Dodanie-wyciągnięcie11 (add)
    with BuildSketch(Plane(origin=(0, 18.15, 0), x_dir=(1, 0, 0), z_dir=(0, 1, 0))):
        with BuildLine():
            Line((28.5, -31.586156124), (30.5, -31.586156124))
            Line((30.5, -31.586156124), (30.5, 40.9))
            ThreePointArc((30.5, 40.9), (29.328427125, 43.728427125), (26.5, 44.9))
            Line((26.5, 44.9), (-20.5, 44.9))
            Line((-20.5, 44.9), (-20.5, 42.9))
            Line((-20.5, 42.9), (28.5, 42.9))
            Line((28.5, 42.9), (28.5, -31.586156124))
        make_face()
    extrude(amount=DODANIE_WYCI_GNI_CIE11_DEPTH)

    # Szkic20 → Dodanie-wyciągnięcie12 (add)
    with BuildSketch(Plane(origin=(30.5, 0, 0), x_dir=(0, 0, -1), z_dir=(1, 0, 0))):
        Polygon((-31.586156124, 22.95), (-39.9, 18.15), (-31.586156124, 18.15), align=None)
    extrude(amount=-DODANIE_WYCI_GNI_CIE12_DEPTH)

    # Szkic18 → Wytnij-wyciągnięcie7 (cut)
    with BuildSketch(Plane(origin=(0, 0, -44.9), x_dir=(-1, 0, 0), z_dir=(0, 0, -1))):
        Polygon((-15, 22.95), (-15, 21.45), (-13, 21.45), (-13, 18.15), (13, 18.15), (13, 21.45), (15, 21.45), (15, 22.95), align=None)
    extrude(amount=-WYTNIJ_WYCI_GNI_CIE7_DEPTH, mode=Mode.SUBTRACT)

    # Szkic21 → Dodanie-wyciągnięcie13 (add)
    with BuildSketch(Plane(origin=(0, 0, -44.9), x_dir=(-1, 0, 0), z_dir=(0, 0, -1))):
        Polygon((-15, 21.45), (-13, 21.45), (-13, 19.15), (13, 19.15), (13, 21.45), (15, 21.45), (15, 17.15), (-15, 17.15), align=None)
    extrude(amount=DODANIE_WYCI_GNI_CIE13_DEPTH)

    # Szkic22 → Dodanie-wyciągnięcie14 (add)
    with BuildSketch(Plane(origin=(0, 19.15, 0), x_dir=(1, 0, 0), z_dir=(0, 1, 0))):
        with Locations((0, 63.9)):
            Rectangle(SZKIC22_W, SZKIC22_H)
    extrude(amount=DODANIE_WYCI_GNI_CIE14_DEPTH)

    # Szkic23 → Dodanie-wyciągnięcie15 (add)
    with BuildSketch(Plane(origin=(0, 19.15, 0), x_dir=(1, 0, 0), z_dir=(0, 1, 0))):
        with Locations(Location((10.5, 47.9, 0), (0, 0, 90))):
            Circle(SZKIC23_R)
        with Locations(Location((-10.5, 47.9, 0), (0, 0, 90))):
            Circle(SZKIC23_R)
        with Locations(Location((-10.5, 60.4, 0), (0, 0, 90))):
            Circle(SZKIC23_R)
        with Locations(Location((10.5, 60.4, 0), (0, 0, 90))):
            Circle(SZKIC23_R)
    extrude(amount=DODANIE_WYCI_GNI_CIE15_DEPTH)

    # Szkic24 → Dodanie-wyciągnięcie16 (add)
    with BuildSketch(Plane(origin=(0, 21.15, 0), x_dir=(1, 0, 0), z_dir=(0, 1, 0))):
        with Locations(Location((-10.5, 60.4, 0), (0, 0, 270))):
            Circle(SZKIC24_R)
    dodanie_wyci_gni_cie16 = extrude(amount=DODANIE_WYCI_GNI_CIE16_DEPTH)

    # Lustro3: Dodanie-wyciągnięcie16 across plane
    add(dodanie_wyci_gni_cie16.mirror(Plane.ZY))

    # Lustro4: Dodanie-wyciągnięcie16 across plane
    add(dodanie_wyci_gni_cie16.mirror(Plane(origin=(0, 0, -54.15), x_dir=(1, 0, 0), z_dir=(0, 0, -1))))

    # Lustro4 copy 1 sketch → Lustro4 copy 1 (add)
    with BuildSketch(Plane(origin=(0, 21.15, -108.3), x_dir=(-1, 0, 0), z_dir=(0, 1, 0))):
        with Locations(Location((-10.5, 60.4, 0), (0, 0, 270))):
            Circle(LUSTRO4_COPY_1_SKETCH_R)
    extrude(amount=LUSTRO4_COPY_1_DEPTH)


solid = part.part
